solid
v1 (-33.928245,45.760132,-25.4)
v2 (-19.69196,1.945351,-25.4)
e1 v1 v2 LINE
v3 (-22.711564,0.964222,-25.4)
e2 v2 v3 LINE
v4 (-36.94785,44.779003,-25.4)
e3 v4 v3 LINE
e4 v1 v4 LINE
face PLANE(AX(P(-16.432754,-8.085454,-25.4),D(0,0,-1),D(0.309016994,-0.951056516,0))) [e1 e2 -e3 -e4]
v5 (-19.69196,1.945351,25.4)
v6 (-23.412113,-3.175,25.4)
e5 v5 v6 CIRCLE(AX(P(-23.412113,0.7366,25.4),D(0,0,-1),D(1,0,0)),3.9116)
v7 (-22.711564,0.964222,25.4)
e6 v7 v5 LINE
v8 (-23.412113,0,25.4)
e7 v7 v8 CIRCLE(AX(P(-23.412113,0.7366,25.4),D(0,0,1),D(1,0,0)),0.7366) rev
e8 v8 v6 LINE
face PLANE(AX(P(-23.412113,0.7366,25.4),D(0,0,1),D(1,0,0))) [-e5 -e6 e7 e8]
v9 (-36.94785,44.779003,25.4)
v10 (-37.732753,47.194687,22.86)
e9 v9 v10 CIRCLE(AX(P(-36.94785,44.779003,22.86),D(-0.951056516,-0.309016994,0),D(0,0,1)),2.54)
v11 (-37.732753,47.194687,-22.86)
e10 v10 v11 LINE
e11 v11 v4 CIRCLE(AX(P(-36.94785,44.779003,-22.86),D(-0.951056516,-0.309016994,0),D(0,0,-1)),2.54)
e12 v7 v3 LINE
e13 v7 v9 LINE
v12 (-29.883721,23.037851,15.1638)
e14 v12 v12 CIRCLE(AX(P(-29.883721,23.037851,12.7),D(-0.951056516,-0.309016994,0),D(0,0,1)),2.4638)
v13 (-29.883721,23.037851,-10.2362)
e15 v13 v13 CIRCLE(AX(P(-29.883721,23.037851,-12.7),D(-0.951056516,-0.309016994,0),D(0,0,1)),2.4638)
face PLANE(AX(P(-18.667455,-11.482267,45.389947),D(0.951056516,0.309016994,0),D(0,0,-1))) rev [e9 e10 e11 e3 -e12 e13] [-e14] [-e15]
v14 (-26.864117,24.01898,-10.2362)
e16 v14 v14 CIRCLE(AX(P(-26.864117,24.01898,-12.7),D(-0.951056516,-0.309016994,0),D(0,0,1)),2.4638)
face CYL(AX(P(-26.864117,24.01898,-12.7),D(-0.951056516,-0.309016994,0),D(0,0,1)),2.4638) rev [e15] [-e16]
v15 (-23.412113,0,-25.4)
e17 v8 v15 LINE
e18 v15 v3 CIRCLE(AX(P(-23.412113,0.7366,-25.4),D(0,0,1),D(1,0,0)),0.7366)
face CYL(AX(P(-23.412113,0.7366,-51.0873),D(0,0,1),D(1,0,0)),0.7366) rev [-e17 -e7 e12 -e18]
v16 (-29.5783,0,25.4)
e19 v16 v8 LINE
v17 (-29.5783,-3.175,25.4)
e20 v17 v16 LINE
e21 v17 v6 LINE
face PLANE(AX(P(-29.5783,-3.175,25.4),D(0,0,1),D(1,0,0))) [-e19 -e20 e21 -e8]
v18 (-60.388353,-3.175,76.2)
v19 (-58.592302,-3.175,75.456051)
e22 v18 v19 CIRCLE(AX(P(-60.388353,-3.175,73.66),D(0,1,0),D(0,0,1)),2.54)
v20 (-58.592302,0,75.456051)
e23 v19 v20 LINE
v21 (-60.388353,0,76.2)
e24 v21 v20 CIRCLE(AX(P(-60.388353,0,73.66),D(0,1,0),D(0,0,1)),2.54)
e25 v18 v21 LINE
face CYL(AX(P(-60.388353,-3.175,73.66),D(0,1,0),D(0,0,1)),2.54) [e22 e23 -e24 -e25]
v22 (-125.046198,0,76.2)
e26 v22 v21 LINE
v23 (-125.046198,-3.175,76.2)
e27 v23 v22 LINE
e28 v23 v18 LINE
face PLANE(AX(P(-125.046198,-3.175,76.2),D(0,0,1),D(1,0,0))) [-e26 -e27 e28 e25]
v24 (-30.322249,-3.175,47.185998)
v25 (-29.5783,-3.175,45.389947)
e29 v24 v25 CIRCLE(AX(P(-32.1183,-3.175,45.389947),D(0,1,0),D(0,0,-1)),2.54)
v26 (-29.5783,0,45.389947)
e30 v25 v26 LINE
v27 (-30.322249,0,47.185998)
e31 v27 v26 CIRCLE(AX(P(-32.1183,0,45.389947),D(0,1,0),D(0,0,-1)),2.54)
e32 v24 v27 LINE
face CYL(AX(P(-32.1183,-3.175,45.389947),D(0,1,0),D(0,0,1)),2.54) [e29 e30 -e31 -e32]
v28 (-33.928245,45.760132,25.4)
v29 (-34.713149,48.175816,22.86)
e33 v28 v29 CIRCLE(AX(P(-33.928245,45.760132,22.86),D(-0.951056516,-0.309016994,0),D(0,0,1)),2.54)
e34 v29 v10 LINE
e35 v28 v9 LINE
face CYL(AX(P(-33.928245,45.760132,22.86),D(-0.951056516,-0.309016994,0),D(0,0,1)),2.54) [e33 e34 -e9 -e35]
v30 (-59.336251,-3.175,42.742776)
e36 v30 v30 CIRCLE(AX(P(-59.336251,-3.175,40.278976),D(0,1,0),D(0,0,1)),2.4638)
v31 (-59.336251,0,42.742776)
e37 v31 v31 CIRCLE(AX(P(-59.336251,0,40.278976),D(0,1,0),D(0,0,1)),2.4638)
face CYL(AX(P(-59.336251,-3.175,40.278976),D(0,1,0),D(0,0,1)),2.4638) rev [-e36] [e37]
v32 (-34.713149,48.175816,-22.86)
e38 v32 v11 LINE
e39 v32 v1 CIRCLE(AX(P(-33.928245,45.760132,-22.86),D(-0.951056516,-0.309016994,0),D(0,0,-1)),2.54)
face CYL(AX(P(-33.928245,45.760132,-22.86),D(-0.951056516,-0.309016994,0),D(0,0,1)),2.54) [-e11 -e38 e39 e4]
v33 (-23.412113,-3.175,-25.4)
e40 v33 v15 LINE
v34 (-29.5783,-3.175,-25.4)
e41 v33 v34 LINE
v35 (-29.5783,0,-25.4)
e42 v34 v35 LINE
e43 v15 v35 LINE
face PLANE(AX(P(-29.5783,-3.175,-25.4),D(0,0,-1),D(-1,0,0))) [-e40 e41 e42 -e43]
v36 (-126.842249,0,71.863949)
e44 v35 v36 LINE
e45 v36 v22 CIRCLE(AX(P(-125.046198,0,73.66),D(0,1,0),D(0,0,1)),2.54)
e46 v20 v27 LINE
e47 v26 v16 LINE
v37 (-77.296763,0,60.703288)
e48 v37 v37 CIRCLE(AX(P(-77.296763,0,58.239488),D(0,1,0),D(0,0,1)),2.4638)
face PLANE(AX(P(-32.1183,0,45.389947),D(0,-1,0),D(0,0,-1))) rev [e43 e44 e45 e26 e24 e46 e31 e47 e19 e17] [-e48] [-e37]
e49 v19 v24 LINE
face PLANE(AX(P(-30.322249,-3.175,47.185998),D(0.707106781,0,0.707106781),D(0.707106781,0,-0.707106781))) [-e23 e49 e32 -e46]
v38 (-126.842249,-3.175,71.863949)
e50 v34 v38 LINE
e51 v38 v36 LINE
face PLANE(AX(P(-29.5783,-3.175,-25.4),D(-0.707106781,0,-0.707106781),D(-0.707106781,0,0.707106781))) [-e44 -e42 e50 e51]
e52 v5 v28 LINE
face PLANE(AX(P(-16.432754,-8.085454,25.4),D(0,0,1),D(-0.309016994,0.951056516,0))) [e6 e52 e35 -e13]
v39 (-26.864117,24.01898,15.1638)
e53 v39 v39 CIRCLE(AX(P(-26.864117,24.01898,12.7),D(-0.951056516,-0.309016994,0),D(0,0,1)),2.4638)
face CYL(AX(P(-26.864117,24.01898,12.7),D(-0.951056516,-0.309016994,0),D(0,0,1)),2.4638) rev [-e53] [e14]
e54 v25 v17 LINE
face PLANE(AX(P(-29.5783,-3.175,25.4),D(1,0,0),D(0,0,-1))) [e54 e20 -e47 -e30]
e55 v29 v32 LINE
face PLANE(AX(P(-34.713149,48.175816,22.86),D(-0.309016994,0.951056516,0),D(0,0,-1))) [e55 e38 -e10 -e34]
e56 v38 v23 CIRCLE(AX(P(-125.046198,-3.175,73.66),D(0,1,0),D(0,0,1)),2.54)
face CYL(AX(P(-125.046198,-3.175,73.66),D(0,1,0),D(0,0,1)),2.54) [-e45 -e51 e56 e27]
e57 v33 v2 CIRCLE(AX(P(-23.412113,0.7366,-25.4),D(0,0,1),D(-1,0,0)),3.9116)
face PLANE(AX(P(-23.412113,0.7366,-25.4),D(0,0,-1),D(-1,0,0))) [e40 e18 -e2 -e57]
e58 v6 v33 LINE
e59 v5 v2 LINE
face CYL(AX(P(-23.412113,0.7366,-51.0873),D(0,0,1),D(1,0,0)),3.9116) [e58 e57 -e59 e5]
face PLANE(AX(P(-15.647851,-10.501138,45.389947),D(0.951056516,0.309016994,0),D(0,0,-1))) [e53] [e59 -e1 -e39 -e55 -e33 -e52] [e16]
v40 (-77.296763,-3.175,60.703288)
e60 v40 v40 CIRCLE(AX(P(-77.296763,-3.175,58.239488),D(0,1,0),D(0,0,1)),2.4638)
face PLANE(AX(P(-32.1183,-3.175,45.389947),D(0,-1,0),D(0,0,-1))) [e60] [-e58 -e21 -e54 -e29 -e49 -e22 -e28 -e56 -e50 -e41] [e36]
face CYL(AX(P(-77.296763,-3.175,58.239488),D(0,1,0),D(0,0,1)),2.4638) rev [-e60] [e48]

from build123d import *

# Parameters (mm, degrees)
SKETCH1_R                  = 2.4638
BASE_FLANGE1_DEPTH         = 3.175
SKETCHED_START             = -25.4
SKETCHED_BEND1_DEPTH       = 50.8
SKETCHED_START_2           = -10.2361999
SKETCHED_BEND1_2_DEPTH     = 20.4723998
SKETCHED_START_3           = -22.86
SKETCHED_BEND1_3_DEPTH     = 7.6961999
SKETCHED_START_4           = 15.1638001
SKETCHED_BEND1_4_DEPTH     = 7.6961999
SKETCHED_BEND1_5_DEPTH     = 50.8
SKETCHED_START_5           = -21.302020374
SKETCHED_BEND1_6_OUTLINE_R = 2.4638
SKETCHED_BEND1_6_DEPTH     = 4.302020374


with BuildPart() as part:
    # Base-Flange1: sheet metal written as solids
    # Sketch1 → Base-Flange1 (new body)
    with BuildSketch(Plane(origin=(0, 0, 0), x_dir=(1, 0, 0), z_dir=(0, 1, 0))):
        with BuildLine():
            Line((-29.5783, 25.4), (-126.842248776, -71.863948776))
            ThreePointArc((-126.842248776, -71.863948776), (-127.392851564, -74.632015918), (-125.046197552, -76.2))
            Line((-125.046197552, -76.2), (-60.38835348, -76.2))
            ThreePointArc((-60.38835348, -76.2), (-59.416337562, -76.006654013), (-58.592302256, -75.456051224))
            Line((-58.592302256, -75.456051224), (-30.322248776, -47.185997744))
            ThreePointArc((-30.322248776, -47.185997744), (-29.771645987, -46.361962438), (-29.5783, -45.38994652))
            Line((-29.5783, -45.38994652), (-29.5783, -25.4))
            Line((-29.5783, -25.4), (27.0383, -25.4))
            ThreePointArc((27.0383, -25.4), (28.834351224, -24.656051224), (29.5783, -22.86))
            Line((29.5783, -22.86), (29.5783, 22.86))
            ThreePointArc((29.5783, 22.86), (28.834351224, 24.656051224), (27.0383, 25.4))
            Line((27.0383, 25.4), (-29.5783, 25.4))
        make_face()
        with Locations(Location((-77.296763274, -58.239487758, 0), (0, 0, 270))):
            Circle(SKETCH1_R, mode=Mode.SUBTRACT)
        with Locations(Location((-59.336251031, -40.278975516, 0), (0, 0, 270))):
            Circle(SKETCH1_R, mode=Mode.SUBTRACT)
        with Locations(Location((4.1783, -12.7, 0), (0, 0, 270))):
            Circle(SKETCH1_R, mode=Mode.SUBTRACT)
        with Locations(Location((4.1783, 12.7, 0), (0, 0, 270))):
            Circle(SKETCH1_R, mode=Mode.SUBTRACT)
    extrude(amount=-BASE_FLANGE1_DEPTH)

    # Sketched Bend1: read off the stored shape, not the designer's step
    # Sketched Bend1 outline → Sketched Bend1 (cut)
    with BuildSketch(Plane.XY.offset(SKETCHED_START)):
        with BuildLine():
            Line((29.5783, 0), (-19.570493847, 0))
            ThreePointArc((-19.570493847, 0), (-20.920192704, -2.278520157), (-23.412112646, -3.175))
            Line((-23.412112646, -3.175), (29.5783, -3.175))
            Line((29.5783, -3.175), (29.5783, 0))
        make_face()
    extrude(amount=SKETCHED_BEND1_DEPTH, mode=Mode.SUBTRACT)

    # Sketched Bend1 2 outline → Sketched Bend1 2 (add)
    with BuildSketch(Plane.XY.offset(SKETCHED_START_2)):
        with BuildLine():
            ThreePointArc((-19.570493847, 0), (-19.508115407, 0.98036242), (-19.691959977, 1.945350875))
            Line((-19.691959977, 1.945350875), (-34.713148559, 48.175815683))
            Line((-34.713148559, 48.175815683), (-37.732752998, 47.194686726))
            Line((-37.732752998, 47.194686726), (-22.711564416, 0.964221918))
            ThreePointArc((-22.711564416, 0.964221918), (-22.816190728, 0.303637383), (-23.412112646, 0))
            Line((-23.412112646, 0), (-19.570493847, 0))
        make_face()
    extrude(amount=SKETCHED_BEND1_2_DEPTH)

    # Sketched Bend1 3 outline → Sketched Bend1 3 (add)
    with BuildSketch(Plane.XY.offset(SKETCHED_START_3)):
        with BuildLine():
            ThreePointArc((-19.570493847, 0), (-19.508115407, 0.98036242), (-19.691959977, 1.945350875))
            Line((-19.691959977, 1.945350875), (-34.713148559, 48.175815683))
            Line((-34.713148559, 48.175815683), (-37.732752998, 47.194686726))
            Line((-37.732752998, 47.194686726), (-22.711564416, 0.964221918))
            ThreePointArc((-22.711564416, 0.964221918), (-22.816190728, 0.303637383), (-23.412112646, 0))
            Line((-23.412112646, 0), (-19.570493847, 0))
        make_face()
    extrude(amount=SKETCHED_BEND1_3_DEPTH)

    # Sketched Bend1 4 outline → Sketched Bend1 4 (add)
    with BuildSketch(Plane.XY.offset(SKETCHED_START_4)):
        with BuildLine():
            ThreePointArc((-19.570493847, 0), (-19.508115407, 0.98036242), (-19.691959977, 1.945350875))
            Line((-19.691959977, 1.945350875), (-34.713148559, 48.175815683))
            Line((-34.713148559, 48.175815683), (-37.732752998, 47.194686726))
            Line((-37.732752998, 47.194686726), (-22.711564416, 0.964221918))
            ThreePointArc((-22.711564416, 0.964221918), (-22.816190728, 0.303637383), (-23.412112646, 0))
            Line((-23.412112646, 0), (-19.570493847, 0))
        make_face()
    extrude(amount=SKETCHED_BEND1_4_DEPTH)

    # Sketched Bend1 5 outline → Sketched Bend1 5 (add)
    with BuildSketch(Plane.XY.offset(SKETCHED_START)):
        with BuildLine():
            ThreePointArc((-19.570493847, 0), (-19.508115407, 0.98036242), (-19.691959977, 1.945350875))
            Line((-19.691959977, 1.945350875), (-34.713148559, 48.175815683))
            Line((-34.713148559, 48.175815683), (-37.732752998, 47.194686726))
            Line((-37.732752998, 47.194686726), (-22.711564416, 0.964221918))
            ThreePointArc((-22.711564416, 0.964221918), (-22.816190728, 0.303637383), (-23.412112646, 0))
            Line((-23.412112646, 0), (-19.570493847, 0))
        make_face()
    extrude(amount=SKETCHED_BEND1_5_DEPTH)

    # Sketched Bend1 6 outline → Sketched Bend1 6 (cut)
    with BuildSketch(Plane(origin=(0, 0, 0), x_dir=(-0.30901699437495117, 0.9510565162951524, 0), z_dir=(0.9510565162951524, 0.3090169943749511, 0)).offset(SKETCHED_START_5)):
        with BuildLine():
            Line((56.544876266, -25.4), (56.544876266, -22.86))
            ThreePointArc((56.544876266, -22.86), (55.80092749, -24.656051224), (54.004876266, -25.4))
            Line((54.004876266, -25.4), (56.544876266, -25.4))
        make_face()
        with BuildLine():
            ThreePointArc((54.004876266, 25.4), (55.80092749, 24.656051224), (56.544876266, 22.86))
            Line((56.544876266, 22.86), (56.544876266, 25.4))
            Line((56.544876266, 25.4), (54.004876266, 25.4))
        make_face()
        with Locations((31.144876266, 12.7)):
            Circle(SKETCHED_BEND1_6_OUTLINE_R)
        with Locations((31.144876266, -12.7)):
            Circle(SKETCHED_BEND1_6_OUTLINE_R)
    extrude(amount=SKETCHED_BEND1_6_DEPTH, mode=Mode.SUBTRACT)


solid = part.part
